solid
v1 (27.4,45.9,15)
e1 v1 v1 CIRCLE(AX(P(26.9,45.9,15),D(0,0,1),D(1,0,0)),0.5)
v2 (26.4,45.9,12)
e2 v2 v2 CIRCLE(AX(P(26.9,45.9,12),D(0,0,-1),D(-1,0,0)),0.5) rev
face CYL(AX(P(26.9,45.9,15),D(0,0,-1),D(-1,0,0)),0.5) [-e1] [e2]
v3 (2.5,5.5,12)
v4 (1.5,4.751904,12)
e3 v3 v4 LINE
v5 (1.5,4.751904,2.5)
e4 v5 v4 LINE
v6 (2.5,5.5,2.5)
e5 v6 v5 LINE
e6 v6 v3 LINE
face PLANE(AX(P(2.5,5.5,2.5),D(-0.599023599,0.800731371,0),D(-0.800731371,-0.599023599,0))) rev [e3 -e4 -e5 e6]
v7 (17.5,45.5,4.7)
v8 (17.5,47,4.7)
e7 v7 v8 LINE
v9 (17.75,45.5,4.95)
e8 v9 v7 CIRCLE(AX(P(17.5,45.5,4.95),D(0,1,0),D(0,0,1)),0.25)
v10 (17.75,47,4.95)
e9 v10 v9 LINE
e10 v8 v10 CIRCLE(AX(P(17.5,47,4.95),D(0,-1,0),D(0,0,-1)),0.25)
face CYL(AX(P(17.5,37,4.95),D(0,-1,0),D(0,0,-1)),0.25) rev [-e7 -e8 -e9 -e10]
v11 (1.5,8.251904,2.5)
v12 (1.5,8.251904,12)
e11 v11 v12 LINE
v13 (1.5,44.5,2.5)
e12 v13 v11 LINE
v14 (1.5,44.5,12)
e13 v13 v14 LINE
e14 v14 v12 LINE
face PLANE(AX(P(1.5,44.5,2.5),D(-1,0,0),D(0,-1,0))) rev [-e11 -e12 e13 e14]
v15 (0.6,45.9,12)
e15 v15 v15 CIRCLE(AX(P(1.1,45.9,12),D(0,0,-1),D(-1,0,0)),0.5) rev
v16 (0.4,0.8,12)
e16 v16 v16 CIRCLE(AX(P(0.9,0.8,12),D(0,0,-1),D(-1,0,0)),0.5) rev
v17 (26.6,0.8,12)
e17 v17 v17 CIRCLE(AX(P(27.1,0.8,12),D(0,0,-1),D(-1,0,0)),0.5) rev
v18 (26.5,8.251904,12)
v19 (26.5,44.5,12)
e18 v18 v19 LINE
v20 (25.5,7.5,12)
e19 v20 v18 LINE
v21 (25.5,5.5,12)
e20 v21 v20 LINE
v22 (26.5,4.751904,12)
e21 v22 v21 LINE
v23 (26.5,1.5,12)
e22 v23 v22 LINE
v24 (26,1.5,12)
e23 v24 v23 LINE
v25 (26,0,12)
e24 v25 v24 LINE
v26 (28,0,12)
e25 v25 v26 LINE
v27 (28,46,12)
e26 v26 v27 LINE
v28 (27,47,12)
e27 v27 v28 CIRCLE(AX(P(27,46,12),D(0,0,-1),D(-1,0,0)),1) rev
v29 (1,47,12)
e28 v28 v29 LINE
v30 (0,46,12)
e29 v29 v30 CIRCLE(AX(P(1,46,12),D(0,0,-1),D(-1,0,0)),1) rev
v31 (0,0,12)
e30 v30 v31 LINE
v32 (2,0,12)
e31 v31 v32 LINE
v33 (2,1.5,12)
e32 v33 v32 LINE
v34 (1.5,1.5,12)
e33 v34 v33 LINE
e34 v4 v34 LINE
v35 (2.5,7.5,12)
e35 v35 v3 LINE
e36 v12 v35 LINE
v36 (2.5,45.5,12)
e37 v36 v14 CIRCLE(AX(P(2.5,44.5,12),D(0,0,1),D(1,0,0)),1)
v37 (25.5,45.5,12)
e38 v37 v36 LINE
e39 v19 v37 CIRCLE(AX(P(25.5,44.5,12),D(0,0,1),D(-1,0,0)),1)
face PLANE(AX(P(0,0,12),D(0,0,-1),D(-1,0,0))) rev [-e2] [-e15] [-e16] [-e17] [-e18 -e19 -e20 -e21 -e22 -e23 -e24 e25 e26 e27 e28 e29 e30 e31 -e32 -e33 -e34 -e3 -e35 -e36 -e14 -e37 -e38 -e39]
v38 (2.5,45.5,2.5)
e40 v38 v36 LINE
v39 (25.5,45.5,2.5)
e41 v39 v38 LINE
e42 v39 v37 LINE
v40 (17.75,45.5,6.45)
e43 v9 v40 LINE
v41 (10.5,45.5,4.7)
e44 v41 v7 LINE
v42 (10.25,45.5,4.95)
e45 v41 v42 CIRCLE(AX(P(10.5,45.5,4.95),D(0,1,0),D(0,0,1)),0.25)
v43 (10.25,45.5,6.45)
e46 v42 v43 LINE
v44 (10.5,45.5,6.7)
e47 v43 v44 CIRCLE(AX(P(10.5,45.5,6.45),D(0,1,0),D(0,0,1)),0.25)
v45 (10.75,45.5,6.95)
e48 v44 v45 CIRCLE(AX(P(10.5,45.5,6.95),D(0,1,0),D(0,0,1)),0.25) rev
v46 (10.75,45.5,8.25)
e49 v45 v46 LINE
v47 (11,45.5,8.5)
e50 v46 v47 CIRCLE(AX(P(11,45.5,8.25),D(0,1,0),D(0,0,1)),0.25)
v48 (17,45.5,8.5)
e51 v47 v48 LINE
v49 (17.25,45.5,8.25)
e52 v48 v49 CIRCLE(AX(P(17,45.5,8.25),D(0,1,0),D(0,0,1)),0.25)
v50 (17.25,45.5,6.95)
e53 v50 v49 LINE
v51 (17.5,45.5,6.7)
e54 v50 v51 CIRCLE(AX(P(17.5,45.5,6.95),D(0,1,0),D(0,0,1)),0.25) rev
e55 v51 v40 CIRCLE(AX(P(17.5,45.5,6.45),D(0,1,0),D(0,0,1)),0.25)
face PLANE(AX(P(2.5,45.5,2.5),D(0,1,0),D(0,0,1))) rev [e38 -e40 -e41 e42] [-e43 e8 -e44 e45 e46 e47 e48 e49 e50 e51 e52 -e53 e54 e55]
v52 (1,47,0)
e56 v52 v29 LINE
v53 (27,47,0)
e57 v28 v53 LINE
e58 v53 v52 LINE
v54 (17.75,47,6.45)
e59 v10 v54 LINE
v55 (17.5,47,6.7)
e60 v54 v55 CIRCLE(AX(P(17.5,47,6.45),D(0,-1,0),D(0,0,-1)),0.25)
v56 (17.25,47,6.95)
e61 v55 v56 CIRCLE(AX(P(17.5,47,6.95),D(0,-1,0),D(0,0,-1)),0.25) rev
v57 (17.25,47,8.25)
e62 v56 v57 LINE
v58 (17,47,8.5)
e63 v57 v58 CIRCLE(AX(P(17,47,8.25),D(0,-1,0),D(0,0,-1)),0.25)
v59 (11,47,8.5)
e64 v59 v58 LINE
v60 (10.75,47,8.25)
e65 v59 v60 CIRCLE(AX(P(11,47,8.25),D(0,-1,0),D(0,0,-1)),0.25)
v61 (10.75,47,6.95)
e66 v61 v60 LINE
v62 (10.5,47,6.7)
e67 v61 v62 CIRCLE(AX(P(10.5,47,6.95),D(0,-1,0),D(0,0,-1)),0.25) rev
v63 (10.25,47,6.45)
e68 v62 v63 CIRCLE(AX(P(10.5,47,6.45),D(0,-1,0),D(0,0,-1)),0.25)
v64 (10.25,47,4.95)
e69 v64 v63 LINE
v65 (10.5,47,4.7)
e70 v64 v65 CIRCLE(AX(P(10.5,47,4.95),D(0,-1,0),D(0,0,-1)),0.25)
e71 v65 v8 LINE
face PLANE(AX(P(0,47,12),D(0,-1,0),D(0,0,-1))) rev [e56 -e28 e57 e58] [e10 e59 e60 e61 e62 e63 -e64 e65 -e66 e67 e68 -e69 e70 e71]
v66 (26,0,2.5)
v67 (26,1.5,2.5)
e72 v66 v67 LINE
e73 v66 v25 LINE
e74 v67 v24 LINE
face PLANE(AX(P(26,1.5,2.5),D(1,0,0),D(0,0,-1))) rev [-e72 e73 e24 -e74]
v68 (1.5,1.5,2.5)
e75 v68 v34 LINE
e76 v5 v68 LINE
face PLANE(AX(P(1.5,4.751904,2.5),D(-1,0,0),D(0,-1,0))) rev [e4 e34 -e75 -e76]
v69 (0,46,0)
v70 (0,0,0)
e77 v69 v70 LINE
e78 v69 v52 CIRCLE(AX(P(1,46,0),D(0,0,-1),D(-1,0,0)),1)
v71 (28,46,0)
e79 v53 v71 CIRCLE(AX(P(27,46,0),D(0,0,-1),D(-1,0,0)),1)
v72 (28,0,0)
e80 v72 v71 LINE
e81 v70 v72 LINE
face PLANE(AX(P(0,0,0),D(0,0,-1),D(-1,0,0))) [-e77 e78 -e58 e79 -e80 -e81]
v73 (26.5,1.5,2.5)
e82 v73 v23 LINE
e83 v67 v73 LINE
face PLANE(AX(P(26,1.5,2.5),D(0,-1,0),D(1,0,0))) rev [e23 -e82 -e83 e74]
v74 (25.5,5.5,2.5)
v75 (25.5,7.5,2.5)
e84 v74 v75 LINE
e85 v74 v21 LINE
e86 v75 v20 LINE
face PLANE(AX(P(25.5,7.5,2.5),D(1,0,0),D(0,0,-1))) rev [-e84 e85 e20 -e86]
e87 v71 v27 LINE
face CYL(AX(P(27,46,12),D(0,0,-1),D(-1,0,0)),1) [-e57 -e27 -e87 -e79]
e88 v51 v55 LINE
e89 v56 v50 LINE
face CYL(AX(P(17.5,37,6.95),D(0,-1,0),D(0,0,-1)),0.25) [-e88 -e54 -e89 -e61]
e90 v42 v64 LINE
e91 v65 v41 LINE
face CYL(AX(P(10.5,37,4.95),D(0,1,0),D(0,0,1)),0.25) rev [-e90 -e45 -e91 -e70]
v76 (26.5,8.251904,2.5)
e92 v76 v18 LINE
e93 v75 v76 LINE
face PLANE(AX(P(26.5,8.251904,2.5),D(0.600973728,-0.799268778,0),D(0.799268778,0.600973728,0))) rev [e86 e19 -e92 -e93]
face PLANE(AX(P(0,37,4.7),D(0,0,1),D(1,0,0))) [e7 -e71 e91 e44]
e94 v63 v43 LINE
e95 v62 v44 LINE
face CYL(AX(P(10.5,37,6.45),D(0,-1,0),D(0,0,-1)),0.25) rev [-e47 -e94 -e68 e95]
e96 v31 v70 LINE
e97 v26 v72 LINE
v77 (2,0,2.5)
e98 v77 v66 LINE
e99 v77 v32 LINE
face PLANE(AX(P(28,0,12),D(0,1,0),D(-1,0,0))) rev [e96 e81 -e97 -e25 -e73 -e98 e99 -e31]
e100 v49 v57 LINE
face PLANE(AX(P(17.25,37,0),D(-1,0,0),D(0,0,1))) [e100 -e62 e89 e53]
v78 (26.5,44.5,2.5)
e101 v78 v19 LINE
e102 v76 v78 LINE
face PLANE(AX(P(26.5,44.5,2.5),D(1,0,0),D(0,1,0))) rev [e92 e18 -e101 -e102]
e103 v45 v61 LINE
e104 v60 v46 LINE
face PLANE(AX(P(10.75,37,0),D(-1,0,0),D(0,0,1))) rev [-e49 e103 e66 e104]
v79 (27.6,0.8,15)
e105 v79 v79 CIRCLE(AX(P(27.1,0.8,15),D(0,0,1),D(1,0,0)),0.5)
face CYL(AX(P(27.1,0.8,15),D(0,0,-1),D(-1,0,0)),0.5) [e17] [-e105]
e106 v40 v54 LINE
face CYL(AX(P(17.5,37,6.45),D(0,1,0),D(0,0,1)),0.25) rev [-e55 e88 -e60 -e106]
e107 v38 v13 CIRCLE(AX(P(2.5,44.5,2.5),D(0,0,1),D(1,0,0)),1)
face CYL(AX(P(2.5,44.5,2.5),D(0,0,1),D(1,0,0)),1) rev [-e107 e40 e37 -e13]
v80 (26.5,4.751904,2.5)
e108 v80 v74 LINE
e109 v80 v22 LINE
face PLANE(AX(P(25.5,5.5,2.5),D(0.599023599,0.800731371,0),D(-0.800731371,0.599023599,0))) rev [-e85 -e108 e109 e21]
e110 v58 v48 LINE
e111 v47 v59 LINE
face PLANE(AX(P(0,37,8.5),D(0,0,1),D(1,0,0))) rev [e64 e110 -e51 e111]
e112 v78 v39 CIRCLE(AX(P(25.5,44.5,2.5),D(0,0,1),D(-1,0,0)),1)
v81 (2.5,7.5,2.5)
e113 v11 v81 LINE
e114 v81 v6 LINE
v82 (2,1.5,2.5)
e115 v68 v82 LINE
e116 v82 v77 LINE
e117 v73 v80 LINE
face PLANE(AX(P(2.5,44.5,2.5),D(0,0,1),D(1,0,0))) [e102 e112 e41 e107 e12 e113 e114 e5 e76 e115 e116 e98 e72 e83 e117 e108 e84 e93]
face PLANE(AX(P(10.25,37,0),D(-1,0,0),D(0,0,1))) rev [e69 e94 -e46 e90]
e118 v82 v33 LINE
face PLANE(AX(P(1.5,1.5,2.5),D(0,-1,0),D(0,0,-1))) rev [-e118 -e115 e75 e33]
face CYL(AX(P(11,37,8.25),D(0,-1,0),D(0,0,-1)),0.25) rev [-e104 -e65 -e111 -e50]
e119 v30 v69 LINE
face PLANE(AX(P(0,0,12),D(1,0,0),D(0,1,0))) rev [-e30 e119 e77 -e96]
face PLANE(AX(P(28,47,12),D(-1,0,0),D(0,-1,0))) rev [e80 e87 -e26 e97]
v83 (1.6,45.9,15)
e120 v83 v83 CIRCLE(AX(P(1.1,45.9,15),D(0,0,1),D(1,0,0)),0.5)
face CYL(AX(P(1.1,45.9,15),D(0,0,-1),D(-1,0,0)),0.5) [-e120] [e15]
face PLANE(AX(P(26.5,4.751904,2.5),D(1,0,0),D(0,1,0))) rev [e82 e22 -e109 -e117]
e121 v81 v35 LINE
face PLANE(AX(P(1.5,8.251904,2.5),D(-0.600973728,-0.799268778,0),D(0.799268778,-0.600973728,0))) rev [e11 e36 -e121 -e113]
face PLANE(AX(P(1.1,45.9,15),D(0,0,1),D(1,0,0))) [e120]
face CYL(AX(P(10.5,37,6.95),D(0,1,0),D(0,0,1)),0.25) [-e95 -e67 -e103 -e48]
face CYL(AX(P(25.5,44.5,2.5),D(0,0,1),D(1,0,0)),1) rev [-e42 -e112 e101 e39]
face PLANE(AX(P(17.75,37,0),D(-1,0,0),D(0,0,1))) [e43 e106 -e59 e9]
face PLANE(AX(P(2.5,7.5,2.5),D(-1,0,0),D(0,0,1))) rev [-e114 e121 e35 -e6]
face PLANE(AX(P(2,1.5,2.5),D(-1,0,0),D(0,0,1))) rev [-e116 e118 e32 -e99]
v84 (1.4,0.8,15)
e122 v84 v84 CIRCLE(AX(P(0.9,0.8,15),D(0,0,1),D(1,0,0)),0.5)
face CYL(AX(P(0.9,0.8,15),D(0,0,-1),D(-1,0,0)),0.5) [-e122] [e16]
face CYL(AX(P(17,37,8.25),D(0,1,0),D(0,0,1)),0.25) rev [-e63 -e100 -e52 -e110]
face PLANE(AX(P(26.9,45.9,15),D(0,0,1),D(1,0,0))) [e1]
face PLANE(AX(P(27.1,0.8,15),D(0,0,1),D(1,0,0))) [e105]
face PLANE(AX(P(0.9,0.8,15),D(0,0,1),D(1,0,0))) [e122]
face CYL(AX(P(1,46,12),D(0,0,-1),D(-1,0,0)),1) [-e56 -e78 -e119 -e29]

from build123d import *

# Parameters (mm, degrees)
SKIZZE1_W                       = 28
SKIZZE1_H                       = 47
AUFSATZ_LINEAR_AUSTRAGEN1_DEPTH = 12
SCHNITT_LINEAR_AUSTRAGEN1_DEPTH = 9.5
VERRUNDUNG2_R                   = 1
SKIZZE3_R                       = 0.5
AUFSATZ_LINEAR_AUSTRAGEN2_DEPTH = 3
SCHNITT_LINEAR_AUSTRAGEN4_DEPTH = 10
VERRUNDUNG3_R                   = 0.25


with BuildPart() as part:
    # Skizze1 → Aufsatz-Linear austragen1 (new body)
    with BuildSketch(Plane.XY):
        with Locations((14, 23.5)):
            Rectangle(SKIZZE1_W, SKIZZE1_H)
    extrude(amount=AUFSATZ_LINEAR_AUSTRAGEN1_DEPTH)

    # Skizze2 → Schnitt-Linear austragen1 (cut)
    with BuildSketch(Plane.XY.offset(12)):
        with BuildLine():
            Line((2.5, 45.5), (25.5, 45.5))
            ThreePointArc((25.5, 45.5), (26.207106781, 45.207106781), (26.5, 44.5))
            Line((26.5, 44.5), (26.5, 8.251904421))
            Line((26.5, 8.251904421), (25.5, 7.5))
            Line((25.5, 7.5), (25.5, 5.5))
            Line((25.5, 5.5), (26.5, 4.751904421))
            Line((26.5, 4.751904421), (26.5, 1.5))
            Line((26.5, 1.5), (26, 1.5))
            Line((26, 1.5), (26, 0))
            Line((26, 0), (2, 0))
            Line((2, 0), (2, 1.5))
            Line((2, 1.5), (1.5, 1.5))
            Line((1.5, 1.5), (1.5, 4.751904421))
            Line((1.5, 4.751904421), (2.5, 5.5))
            Line((2.5, 5.5), (2.5, 7.5))
            Line((2.5, 7.5), (1.5, 8.251904421))
            Line((1.5, 8.251904421), (1.5, 44.5))
            ThreePointArc((1.5, 44.5), (1.792893219, 45.207106781), (2.5, 45.5))
        make_face()
    extrude(amount=-SCHNITT_LINEAR_AUSTRAGEN1_DEPTH, mode=Mode.SUBTRACT)

    # Verrundung2
    verrundung2_edges = [part.edges().sort_by_distance(p)[0] for p in [
        (0, 47, 6),
        (28, 47, 6),
    ]]
    fillet(verrundung2_edges, radius=VERRUNDUNG2_R)

    # Skizze3 → Aufsatz-Linear austragen2 (add)
    with BuildSketch(Plane.XY.offset(12)):
        with Locations(Location((1.1, 45.9, 0), (0, 0, 180))):
            Circle(SKIZZE3_R)
        with Locations(Location((26.9, 45.9, 0), (0, 0, 180))):
            Circle(SKIZZE3_R)
        with Locations(Location((0.9, 0.8, 0), (0, 0, 180))):
            Circle(SKIZZE3_R)
        with Locations(Location((27.1, 0.8, 0), (0, 0, 180))):
            Circle(SKIZZE3_R)
    extrude(amount=AUFSATZ_LINEAR_AUSTRAGEN2_DEPTH)

    # Skizze4 → Schnitt-Linear austragen4 (cut)
    with BuildSketch(Plane(origin=(0, 47, 0), x_dir=(1, 0, 0), z_dir=(0, 1, 0))):
        Polygon((10.25, -4.7), (10.25, -6.7), (10.75, -6.7), (10.75, -8.5), (17.25, -8.5), (17.25, -6.7), (17.75, -6.7), (17.75, -4.7), align=None)
    extrude(amount=-SCHNITT_LINEAR_AUSTRAGEN4_DEPTH, mode=Mode.SUBTRACT)

    # Verrundung3
    verrundung3_edges = [part.edges().sort_by_distance(p)[0] for p in [
        (17.25, 46.25, 6.7),
        (17.25, 46.25, 8.5),
        (10.75, 46.25, 6.7),
        (10.25, 46.25, 6.7),
        (17.75, 46.25, 6.7),
        (17.75, 46.25, 4.7),
        (10.25, 46.25, 4.7),
        (10.75, 46.25, 8.5),
    ]]
    fillet(verrundung3_edges, radius=VERRUNDUNG3_R - 0.0001)  # a hair under: the kernel refuses the full size


solid = part.part
